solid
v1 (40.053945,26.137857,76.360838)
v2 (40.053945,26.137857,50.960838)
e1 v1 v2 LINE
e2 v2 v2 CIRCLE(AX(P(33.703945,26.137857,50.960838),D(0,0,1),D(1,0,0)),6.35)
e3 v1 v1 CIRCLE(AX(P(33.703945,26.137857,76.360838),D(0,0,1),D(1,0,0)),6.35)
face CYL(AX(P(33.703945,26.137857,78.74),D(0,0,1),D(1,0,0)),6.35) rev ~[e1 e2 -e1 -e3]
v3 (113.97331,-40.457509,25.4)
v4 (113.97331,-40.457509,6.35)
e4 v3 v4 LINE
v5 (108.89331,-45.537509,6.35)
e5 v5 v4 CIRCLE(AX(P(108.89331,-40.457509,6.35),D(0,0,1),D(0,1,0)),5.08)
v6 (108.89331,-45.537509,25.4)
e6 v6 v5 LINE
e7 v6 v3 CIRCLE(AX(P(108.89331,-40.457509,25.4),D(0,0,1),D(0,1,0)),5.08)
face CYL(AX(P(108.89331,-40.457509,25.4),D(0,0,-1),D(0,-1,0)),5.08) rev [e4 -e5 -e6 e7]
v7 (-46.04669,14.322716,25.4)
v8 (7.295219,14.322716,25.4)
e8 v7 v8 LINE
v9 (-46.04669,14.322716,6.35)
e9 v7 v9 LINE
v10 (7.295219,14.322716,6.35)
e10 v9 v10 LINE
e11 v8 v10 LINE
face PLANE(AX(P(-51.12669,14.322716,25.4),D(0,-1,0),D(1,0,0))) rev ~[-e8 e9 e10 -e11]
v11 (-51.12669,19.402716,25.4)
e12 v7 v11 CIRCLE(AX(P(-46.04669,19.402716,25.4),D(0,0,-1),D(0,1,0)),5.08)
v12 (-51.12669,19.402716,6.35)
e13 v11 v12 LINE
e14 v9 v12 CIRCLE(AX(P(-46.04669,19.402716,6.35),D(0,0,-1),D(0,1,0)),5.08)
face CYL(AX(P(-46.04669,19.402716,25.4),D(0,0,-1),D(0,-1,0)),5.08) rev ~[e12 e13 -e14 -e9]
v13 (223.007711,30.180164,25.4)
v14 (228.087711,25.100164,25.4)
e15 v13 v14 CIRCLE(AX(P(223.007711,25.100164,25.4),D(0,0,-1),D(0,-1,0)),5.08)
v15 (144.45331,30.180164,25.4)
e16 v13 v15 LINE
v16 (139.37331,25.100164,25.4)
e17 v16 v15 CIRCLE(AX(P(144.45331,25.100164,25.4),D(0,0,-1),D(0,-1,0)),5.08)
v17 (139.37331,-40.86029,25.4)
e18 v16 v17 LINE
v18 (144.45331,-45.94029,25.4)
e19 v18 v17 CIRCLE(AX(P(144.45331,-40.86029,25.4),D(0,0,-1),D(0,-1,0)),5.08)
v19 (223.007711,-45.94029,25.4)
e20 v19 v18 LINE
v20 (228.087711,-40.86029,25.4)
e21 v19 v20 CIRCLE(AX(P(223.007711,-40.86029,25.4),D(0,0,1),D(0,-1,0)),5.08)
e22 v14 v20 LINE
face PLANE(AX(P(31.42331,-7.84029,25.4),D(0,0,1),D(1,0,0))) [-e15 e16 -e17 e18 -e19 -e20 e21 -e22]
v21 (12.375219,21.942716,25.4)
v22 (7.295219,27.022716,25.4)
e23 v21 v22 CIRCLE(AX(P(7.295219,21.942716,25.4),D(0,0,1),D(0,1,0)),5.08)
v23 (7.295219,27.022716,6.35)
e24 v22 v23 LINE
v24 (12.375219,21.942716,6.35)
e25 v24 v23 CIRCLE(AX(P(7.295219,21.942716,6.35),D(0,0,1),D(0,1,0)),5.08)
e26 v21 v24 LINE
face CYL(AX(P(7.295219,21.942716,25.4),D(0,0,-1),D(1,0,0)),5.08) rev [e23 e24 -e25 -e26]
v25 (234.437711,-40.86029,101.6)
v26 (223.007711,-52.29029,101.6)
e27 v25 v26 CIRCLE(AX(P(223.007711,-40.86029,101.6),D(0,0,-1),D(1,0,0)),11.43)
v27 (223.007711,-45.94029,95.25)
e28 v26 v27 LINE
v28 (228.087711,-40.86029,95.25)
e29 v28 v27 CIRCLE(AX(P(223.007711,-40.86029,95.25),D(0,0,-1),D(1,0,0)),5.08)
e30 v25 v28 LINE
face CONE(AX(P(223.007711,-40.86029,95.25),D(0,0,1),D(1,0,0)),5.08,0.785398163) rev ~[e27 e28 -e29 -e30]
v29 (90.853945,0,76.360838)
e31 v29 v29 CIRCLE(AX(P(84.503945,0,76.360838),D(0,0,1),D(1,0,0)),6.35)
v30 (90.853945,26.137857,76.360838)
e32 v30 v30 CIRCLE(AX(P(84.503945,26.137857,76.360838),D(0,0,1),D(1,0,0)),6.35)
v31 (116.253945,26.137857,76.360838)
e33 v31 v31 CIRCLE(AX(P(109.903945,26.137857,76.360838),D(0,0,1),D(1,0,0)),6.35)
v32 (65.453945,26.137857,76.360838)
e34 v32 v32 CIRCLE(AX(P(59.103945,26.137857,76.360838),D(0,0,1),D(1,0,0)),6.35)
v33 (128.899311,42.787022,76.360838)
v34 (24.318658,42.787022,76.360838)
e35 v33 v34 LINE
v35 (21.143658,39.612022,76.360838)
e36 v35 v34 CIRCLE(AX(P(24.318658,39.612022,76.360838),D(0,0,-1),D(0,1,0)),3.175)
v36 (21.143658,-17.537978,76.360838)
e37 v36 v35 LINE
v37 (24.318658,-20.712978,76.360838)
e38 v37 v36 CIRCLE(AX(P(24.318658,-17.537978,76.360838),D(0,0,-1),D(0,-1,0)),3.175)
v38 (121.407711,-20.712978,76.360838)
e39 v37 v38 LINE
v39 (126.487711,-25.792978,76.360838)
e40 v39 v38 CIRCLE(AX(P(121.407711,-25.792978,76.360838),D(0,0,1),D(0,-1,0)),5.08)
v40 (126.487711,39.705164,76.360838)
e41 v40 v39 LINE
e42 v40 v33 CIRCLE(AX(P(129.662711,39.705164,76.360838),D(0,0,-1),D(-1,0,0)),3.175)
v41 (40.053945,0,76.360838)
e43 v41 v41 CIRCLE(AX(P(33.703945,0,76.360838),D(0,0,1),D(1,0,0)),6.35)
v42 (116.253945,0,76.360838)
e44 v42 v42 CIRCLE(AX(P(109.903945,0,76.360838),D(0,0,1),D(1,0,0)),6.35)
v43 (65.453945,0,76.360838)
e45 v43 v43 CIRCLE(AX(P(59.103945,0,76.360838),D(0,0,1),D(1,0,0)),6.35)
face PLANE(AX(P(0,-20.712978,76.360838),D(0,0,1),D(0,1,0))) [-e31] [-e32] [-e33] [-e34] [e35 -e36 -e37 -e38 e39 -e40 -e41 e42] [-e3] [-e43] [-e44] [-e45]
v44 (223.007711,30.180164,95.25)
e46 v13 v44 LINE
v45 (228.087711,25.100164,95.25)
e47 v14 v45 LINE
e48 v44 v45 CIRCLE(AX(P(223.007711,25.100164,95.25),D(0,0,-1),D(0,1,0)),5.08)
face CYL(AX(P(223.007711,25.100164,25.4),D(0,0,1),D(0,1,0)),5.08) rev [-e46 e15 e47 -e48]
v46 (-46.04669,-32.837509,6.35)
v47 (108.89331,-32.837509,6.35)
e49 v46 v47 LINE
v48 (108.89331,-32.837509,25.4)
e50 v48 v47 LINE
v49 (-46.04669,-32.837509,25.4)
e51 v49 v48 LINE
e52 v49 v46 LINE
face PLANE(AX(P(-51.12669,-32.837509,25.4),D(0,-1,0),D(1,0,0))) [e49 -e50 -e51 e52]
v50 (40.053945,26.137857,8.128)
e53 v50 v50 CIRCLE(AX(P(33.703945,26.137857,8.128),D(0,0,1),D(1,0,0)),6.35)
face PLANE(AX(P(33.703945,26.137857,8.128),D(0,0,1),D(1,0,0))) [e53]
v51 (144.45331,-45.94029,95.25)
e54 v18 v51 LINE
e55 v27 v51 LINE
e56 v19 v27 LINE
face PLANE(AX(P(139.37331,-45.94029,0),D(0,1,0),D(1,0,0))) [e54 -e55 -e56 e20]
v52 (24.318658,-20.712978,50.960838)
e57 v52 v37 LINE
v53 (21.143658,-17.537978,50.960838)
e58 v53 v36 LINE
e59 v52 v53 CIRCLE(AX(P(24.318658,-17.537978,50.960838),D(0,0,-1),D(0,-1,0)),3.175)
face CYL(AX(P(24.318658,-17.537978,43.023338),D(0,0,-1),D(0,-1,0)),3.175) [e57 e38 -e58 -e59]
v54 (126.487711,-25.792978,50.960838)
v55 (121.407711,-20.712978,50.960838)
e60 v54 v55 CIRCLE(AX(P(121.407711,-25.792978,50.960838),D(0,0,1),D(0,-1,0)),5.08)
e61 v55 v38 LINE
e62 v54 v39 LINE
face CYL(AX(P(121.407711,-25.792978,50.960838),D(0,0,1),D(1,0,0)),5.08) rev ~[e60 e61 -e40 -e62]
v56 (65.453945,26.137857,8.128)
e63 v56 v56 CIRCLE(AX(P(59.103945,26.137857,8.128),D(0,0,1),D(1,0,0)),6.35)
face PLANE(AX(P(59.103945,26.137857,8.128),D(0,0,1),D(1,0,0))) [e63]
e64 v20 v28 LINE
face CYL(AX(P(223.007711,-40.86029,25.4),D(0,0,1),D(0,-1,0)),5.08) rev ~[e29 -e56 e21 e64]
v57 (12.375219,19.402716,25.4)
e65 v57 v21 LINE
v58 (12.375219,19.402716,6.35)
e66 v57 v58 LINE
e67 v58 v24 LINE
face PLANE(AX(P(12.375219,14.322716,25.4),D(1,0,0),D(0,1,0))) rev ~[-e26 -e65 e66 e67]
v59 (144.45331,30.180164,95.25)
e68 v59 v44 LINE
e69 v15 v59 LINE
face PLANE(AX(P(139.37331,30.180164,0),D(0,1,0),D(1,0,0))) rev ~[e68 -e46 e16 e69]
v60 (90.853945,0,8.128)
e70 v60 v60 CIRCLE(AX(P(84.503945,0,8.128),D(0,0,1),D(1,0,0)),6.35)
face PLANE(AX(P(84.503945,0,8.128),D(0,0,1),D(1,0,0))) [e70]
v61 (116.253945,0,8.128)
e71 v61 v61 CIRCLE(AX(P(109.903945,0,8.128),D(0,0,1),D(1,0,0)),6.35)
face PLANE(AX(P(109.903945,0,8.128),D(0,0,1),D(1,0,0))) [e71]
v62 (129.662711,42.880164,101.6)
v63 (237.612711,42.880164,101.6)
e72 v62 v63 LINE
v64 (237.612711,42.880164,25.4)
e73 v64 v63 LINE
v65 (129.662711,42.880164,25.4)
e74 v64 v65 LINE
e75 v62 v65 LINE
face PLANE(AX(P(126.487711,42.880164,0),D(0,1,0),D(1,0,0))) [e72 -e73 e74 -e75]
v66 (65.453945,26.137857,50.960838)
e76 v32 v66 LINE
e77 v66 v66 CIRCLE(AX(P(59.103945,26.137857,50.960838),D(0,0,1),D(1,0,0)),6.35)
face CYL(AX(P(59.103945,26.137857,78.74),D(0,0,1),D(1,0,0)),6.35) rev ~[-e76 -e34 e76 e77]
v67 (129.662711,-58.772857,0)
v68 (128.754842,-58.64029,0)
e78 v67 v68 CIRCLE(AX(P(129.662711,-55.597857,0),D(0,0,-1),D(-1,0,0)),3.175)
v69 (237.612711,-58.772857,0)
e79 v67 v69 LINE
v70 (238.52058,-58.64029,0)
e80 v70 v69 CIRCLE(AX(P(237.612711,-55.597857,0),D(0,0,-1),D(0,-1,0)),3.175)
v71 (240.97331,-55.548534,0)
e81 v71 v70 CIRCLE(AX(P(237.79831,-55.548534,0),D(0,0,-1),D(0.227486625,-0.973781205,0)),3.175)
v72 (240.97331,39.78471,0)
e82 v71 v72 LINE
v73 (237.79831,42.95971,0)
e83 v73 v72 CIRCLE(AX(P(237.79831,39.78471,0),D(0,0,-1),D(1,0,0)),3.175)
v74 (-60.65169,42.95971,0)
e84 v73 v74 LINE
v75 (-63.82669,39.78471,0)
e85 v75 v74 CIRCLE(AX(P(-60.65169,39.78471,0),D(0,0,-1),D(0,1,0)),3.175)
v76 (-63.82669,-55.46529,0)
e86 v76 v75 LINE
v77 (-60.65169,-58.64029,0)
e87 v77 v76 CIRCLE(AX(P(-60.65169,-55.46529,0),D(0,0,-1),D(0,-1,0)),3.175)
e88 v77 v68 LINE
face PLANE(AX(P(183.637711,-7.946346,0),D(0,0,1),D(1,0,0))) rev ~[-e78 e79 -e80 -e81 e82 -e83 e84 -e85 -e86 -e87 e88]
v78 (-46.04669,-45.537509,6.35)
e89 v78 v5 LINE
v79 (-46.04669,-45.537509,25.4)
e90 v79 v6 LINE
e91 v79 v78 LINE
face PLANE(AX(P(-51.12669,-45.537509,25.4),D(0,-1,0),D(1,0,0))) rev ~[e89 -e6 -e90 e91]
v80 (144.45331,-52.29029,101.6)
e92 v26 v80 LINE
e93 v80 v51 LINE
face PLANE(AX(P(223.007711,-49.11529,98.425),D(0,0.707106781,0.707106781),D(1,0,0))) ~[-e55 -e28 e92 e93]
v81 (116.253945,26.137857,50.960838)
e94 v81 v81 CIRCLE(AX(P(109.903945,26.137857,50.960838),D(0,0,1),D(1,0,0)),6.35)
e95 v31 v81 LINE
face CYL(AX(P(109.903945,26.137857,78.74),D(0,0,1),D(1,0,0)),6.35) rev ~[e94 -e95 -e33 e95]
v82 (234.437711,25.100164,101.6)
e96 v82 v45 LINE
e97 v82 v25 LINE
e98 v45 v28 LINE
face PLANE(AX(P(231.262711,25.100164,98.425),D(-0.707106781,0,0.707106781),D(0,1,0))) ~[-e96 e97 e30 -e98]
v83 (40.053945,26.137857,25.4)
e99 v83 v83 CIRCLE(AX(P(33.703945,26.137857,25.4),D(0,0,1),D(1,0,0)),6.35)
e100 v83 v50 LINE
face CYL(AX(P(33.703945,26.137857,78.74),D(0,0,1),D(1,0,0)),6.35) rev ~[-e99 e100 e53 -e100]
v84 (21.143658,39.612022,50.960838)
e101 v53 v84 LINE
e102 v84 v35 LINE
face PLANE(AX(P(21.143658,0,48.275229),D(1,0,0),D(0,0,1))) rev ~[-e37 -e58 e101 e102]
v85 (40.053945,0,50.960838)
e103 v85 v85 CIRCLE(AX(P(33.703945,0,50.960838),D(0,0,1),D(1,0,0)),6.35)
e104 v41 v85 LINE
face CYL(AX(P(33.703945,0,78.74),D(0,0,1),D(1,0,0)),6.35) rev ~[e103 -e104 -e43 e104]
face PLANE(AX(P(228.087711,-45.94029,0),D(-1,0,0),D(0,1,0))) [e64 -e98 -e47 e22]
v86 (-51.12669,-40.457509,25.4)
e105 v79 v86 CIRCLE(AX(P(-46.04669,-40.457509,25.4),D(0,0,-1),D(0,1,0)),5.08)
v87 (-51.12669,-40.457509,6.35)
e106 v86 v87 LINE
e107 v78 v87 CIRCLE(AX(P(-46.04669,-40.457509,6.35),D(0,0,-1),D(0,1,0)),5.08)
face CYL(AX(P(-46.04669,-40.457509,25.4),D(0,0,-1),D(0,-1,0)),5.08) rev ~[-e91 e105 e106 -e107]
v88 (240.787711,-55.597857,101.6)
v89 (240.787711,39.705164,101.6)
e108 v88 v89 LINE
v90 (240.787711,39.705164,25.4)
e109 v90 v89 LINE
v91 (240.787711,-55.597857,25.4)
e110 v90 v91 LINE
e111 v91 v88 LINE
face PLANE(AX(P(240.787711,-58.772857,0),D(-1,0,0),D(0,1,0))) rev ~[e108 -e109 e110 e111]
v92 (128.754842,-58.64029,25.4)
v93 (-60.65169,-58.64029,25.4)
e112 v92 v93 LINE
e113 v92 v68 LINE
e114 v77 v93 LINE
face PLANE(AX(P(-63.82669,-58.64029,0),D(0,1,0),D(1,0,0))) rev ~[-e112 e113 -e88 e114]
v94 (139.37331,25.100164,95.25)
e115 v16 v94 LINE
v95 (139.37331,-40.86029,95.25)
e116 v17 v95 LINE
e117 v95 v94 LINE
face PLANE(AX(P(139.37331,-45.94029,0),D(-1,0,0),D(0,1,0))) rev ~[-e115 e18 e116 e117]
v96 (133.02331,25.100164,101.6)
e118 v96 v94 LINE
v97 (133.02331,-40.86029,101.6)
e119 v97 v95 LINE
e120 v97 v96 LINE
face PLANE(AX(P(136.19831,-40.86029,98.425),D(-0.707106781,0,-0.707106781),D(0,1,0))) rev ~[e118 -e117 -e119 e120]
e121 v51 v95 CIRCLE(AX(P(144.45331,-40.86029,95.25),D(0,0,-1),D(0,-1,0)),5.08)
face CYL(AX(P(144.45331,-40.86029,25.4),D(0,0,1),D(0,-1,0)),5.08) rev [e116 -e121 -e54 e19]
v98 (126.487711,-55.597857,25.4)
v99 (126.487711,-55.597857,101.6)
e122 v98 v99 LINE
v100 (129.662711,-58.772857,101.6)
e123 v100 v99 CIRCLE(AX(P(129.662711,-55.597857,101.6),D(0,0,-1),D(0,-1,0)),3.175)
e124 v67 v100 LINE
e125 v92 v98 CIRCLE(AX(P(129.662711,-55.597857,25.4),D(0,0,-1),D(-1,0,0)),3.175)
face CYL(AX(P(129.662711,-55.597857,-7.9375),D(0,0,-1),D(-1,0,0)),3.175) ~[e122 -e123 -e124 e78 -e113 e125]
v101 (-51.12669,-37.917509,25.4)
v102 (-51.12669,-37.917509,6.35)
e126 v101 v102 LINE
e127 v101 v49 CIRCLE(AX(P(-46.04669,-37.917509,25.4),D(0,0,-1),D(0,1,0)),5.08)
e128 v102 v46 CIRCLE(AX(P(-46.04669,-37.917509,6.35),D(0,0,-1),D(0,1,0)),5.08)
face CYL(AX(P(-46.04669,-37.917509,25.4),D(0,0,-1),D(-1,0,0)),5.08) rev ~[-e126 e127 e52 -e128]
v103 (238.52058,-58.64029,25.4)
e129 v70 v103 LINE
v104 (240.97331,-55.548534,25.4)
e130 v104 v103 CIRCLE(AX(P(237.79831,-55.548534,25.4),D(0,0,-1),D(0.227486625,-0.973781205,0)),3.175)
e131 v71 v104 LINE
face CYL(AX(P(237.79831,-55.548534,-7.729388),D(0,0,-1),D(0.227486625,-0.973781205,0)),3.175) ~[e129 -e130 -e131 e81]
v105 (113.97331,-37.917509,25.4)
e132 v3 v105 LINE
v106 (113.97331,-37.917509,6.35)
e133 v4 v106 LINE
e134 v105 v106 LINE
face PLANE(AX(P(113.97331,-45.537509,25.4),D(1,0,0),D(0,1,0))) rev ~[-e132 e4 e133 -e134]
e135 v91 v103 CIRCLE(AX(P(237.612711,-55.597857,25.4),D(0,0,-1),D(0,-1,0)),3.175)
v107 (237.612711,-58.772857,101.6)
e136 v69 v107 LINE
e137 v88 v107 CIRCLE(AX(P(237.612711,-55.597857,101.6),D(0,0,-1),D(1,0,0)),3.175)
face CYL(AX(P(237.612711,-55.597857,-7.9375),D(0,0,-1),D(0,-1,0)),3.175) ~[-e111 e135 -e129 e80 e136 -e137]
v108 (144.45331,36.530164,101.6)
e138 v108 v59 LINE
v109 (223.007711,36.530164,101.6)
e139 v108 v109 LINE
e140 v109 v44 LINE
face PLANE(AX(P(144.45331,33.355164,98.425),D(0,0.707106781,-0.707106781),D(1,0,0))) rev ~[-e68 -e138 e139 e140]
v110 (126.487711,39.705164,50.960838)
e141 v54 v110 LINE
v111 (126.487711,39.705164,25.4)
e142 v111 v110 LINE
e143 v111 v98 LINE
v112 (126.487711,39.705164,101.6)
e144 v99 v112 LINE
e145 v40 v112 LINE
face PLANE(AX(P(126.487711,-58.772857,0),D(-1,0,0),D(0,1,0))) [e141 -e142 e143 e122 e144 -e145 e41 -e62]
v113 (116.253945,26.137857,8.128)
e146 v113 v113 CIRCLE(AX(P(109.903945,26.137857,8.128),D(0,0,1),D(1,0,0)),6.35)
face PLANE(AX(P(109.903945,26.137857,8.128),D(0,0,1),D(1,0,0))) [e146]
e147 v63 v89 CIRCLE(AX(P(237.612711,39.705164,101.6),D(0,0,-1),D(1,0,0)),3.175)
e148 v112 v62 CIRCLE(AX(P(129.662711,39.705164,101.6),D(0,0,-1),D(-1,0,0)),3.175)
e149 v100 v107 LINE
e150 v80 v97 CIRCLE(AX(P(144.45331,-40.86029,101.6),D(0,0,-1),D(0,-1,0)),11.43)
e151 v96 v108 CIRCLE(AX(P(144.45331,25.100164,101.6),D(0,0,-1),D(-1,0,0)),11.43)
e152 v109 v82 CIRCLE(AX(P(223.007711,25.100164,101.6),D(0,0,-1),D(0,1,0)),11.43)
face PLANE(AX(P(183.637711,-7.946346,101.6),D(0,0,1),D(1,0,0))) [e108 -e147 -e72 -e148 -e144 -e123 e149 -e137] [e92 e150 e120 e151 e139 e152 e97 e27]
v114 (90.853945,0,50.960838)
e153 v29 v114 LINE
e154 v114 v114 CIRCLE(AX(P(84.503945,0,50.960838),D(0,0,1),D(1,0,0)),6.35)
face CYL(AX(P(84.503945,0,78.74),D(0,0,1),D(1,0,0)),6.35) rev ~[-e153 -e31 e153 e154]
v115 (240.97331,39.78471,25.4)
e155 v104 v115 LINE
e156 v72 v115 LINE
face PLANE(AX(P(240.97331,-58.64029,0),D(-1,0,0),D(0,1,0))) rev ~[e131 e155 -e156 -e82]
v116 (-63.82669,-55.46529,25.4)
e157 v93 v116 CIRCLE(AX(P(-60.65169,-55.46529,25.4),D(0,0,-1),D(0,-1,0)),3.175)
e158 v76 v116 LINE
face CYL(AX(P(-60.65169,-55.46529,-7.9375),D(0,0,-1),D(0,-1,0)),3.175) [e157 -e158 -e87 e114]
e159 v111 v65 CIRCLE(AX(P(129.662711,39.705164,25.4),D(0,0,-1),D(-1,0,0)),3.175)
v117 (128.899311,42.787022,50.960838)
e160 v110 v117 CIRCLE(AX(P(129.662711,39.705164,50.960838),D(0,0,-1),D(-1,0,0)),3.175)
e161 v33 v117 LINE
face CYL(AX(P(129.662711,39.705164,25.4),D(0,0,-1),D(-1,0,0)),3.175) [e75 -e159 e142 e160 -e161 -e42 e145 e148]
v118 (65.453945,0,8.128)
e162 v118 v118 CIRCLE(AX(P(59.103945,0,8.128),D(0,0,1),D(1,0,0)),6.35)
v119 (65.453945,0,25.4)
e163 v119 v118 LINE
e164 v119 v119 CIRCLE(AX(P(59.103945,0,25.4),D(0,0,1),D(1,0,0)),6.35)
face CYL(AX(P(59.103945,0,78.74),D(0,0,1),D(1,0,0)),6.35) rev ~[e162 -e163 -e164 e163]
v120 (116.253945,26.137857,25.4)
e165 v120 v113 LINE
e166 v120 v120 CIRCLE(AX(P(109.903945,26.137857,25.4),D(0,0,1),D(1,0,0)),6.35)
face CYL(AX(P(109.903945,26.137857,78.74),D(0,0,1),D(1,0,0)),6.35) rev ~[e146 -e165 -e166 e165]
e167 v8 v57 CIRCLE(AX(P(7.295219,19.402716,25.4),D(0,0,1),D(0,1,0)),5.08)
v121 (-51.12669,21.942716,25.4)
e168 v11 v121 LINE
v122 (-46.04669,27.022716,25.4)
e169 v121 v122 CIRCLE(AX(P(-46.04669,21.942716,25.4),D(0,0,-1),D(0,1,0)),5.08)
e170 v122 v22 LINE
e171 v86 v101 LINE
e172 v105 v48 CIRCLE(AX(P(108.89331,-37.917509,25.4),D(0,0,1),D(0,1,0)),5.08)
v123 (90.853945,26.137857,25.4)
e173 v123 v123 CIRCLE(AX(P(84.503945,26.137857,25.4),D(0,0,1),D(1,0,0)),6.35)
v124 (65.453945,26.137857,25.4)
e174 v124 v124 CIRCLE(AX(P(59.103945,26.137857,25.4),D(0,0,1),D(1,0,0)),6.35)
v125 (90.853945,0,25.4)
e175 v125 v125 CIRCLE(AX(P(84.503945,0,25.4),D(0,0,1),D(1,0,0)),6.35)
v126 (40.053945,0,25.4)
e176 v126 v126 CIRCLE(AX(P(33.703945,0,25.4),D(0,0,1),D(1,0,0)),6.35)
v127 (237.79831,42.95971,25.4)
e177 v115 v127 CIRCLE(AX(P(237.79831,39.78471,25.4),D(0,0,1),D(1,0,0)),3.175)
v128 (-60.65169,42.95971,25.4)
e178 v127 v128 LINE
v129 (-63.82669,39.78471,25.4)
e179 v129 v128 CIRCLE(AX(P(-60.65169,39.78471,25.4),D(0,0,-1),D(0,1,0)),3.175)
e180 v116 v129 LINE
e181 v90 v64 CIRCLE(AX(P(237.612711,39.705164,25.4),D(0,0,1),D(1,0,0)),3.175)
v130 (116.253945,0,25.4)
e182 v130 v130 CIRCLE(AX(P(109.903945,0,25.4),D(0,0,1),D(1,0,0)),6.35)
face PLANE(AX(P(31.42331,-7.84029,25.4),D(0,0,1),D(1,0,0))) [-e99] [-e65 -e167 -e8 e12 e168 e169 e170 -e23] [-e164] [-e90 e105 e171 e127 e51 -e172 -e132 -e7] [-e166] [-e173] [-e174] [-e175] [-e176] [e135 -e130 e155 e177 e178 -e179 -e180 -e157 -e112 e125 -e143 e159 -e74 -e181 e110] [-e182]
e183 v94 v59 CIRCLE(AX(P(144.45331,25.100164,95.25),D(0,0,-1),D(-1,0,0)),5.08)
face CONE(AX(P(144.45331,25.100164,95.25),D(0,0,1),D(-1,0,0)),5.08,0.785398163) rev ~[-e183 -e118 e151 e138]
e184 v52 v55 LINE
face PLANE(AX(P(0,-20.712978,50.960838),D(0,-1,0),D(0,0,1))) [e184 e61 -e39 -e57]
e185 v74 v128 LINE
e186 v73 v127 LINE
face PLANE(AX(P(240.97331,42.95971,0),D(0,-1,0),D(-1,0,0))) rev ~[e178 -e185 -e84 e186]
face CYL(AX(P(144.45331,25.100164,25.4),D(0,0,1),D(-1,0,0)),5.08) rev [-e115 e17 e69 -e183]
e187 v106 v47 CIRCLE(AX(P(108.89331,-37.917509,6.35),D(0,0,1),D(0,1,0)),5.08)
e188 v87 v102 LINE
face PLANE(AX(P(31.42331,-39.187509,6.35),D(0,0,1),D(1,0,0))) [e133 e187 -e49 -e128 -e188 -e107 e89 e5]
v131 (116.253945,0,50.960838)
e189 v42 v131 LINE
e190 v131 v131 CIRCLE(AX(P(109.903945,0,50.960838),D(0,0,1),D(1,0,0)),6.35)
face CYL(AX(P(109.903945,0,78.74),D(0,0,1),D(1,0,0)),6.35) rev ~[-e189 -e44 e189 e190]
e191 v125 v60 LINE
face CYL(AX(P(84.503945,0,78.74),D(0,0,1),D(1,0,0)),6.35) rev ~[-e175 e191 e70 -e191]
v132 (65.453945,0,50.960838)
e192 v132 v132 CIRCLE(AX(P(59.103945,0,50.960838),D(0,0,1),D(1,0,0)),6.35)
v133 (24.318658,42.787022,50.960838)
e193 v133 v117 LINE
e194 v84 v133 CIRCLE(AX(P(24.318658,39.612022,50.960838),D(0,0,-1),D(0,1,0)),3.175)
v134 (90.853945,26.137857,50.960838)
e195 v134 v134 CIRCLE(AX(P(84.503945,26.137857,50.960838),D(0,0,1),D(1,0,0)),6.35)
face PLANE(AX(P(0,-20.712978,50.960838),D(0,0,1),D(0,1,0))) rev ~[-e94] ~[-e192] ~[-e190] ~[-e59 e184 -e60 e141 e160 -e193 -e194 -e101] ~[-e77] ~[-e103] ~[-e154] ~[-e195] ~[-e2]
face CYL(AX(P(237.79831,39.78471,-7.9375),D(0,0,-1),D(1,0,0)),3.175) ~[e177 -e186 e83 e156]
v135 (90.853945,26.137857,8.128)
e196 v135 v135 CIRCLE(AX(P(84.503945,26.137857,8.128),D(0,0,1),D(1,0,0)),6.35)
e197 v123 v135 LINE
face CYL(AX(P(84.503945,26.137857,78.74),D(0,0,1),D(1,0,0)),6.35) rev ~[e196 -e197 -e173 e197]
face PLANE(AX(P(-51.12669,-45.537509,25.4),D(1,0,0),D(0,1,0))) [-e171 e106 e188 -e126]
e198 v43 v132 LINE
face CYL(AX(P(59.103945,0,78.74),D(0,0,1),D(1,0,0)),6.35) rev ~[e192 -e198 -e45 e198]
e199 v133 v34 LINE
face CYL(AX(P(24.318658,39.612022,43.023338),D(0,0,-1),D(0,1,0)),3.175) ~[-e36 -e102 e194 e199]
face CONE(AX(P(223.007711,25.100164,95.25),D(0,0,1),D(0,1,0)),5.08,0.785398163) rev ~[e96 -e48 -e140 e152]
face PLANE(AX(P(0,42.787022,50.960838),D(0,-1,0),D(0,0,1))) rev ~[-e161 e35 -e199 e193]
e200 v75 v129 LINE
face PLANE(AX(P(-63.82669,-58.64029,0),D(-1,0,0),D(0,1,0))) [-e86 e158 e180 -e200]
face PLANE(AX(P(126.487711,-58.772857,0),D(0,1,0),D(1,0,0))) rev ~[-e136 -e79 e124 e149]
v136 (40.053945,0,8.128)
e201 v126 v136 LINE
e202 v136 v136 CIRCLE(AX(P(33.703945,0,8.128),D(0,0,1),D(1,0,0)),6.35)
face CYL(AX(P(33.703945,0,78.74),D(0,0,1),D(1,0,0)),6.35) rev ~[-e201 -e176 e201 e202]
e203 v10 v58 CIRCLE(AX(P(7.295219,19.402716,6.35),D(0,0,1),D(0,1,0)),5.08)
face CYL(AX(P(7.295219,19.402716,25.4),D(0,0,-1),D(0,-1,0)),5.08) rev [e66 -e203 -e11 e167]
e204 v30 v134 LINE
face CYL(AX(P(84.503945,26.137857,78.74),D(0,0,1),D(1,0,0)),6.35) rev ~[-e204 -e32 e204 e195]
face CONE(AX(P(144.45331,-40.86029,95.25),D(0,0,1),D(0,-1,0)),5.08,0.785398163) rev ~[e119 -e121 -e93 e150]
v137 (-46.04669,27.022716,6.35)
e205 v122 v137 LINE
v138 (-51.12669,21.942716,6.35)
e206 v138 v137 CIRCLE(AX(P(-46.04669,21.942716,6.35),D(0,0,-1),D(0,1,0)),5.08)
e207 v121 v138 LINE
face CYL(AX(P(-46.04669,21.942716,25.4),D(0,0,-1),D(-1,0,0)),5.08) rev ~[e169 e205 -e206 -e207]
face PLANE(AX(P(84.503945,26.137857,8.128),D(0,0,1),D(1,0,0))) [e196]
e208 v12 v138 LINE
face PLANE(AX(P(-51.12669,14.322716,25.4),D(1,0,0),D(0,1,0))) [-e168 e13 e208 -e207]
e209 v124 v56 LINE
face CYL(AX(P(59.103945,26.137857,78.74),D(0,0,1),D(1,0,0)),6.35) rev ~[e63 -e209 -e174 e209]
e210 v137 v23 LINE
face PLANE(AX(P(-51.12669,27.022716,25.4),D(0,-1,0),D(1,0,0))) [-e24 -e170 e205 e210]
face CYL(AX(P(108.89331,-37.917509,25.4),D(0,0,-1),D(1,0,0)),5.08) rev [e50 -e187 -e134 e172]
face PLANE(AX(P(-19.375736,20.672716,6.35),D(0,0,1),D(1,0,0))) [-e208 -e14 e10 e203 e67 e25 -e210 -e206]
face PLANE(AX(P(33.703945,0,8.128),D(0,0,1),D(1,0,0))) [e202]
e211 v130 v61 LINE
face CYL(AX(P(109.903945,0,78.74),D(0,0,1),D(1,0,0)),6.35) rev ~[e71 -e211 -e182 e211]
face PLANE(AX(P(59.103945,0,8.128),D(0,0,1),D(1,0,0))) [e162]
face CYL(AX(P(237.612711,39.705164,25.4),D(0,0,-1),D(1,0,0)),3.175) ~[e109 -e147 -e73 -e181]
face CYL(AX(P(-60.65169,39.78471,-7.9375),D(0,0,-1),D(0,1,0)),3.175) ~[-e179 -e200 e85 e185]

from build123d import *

# Parameters (mm, degrees)
F0_W          = 190.5
F0_H          = 101.6
F0_W_2        = 114.3
F0_W_3        = 88.9
F0_H_2        = 76.1922433317
F1_DEPTH      = 25.4
F2_W          = 114.3
F2_H          = 101.6530208289
F2_W_2        = 88.7144011029
F2_H_2        = 76.1204539018
F3_DEPTH      = 101.6
F4_W          = 63.5
F4_H          = 25.4
F5_DEPTH      = 126.4877107566
F6_W          = 21.1436580867
F6_H          = 30.0582610071
F7_DEPTH      = 108.712
F9_W          = 63.5019093752
F9_H          = 12.7
F9_W_2        = 165.1
F10_DEPTH     = 19.05
F12_R         = 6.35
F13_DEPTH     = 70.612
F14_T1_DEPTH  = 41.275
F14_T3_DEPTH  = 41.275
F14_T5_DEPTH  = 84.1375
F14_T10_DEPTH = 117.475
F14_T16_DEPTH = 117.475
F14_T22_DEPTH = 117.475
F14_T28_DEPTH = 84.1375
F14_T34_DEPTH = 84.1375
F14_T40_DEPTH = 84.1375
F14_T47_DEPTH = 84.1375
F14_T53_DEPTH = 84.1375
F14_T59_DEPTH = 117.475
F14_T65_DEPTH = 117.475
F14_T71_DEPTH = 117.475
F15_T1_DEPTH  = 40.8587766312
F15_T3_DEPTH  = 41.275
F16_R         = 5.08
F17_SIZE      = 6.35


# Not quite as in the source:
# - a fillet or chamfer that OpenCascade refuses, or shapes differently, is made with other operations: its cross-section is extruded or revolved along the edge and cut away or added


with BuildPart() as f1:
    # F0 (on Top) → F1 (new body)
    with BuildSketch(Plane.XY):
        with Locations((31.4233096536, -7.8402895808)):
            Rectangle(F0_W, F0_H)
        with Locations((183.8233096536, -7.8402895808)):
            Rectangle(F0_W_2, F0_H)
        with Locations((183.8233096536, -7.844167915)):
            Rectangle(F0_W_3, F0_H_2, mode=Mode.SUBTRACT)
        with Locations((183.8233096536, -7.844167915)):
            Rectangle(F0_W_3, F0_H_2)
    extrude(amount=F1_DEPTH)

    # F2 (on Top) → F3 (join)
    with BuildSketch(Plane.XY):
        with Locations((183.6377107566, -7.9463460934)):
            Rectangle(F2_W, F2_H)
        with Locations((183.7305102051, -7.8800626299)):
            Rectangle(F2_W_2, F2_H_2, mode=Mode.SUBTRACT)
    extrude(amount=F3_DEPTH)

    # F4 (on Right) → F5 (join, through all)
    with BuildSketch(Plane.YZ):
        with Locations((11.0370218754, 63.6608382941)):
            Rectangle(F4_W, F4_H)
    extrude(amount=F5_DEPTH)

    # F6 (on Front) → F7 (cut, symmetric)
    with BuildSketch(Plane.XZ):
        with Locations((10.5718290433, 63.3043590933)):
            Rectangle(F6_W, F6_H)
    extrude(amount=F7_DEPTH, both=True, mode=Mode.SUBTRACT)

    # F9 (on offset) → F10 (cut)
    with BuildSketch(Plane.XY.offset(25.4)):
        with Locations((-19.3757356588, 20.6727156579)):
            Rectangle(F9_W, F9_H)
        with Locations((31.4233096536, -39.1875091776)):
            Rectangle(F9_W_2, F9_H)
    extrude(amount=-F10_DEPTH, mode=Mode.SUBTRACT)

    # F12 (on offset) → F13 (cut)
    with BuildSketch(Plane.XY.offset(78.74)):
        with Locations((33.7039453115, 26.1378572217)):
            Circle(F12_R)
        with Locations((59.1039453115, 26.1378572217)):
            Circle(F12_R)
        with Locations((84.5039453115, 26.1378572217)):
            Circle(F12_R)
        with Locations((109.9039453115, 26.1378572217)):
            Circle(F12_R)
        with Locations((109.9039453115, 0)):
            Circle(F12_R)
        with Locations((84.5039453115, 0)):
            Circle(F12_R)
        with Locations((59.1039453115, 0)):
            Circle(F12_R)
        with Locations((33.7039453115, 0)):
            Circle(F12_R)
    extrude(amount=-F13_DEPTH, mode=Mode.SUBTRACT)

    # F14: fillet of radius 3.175 on 7 edges, made by hand

    # F14_s2 → F14_t1 (cut)
    with BuildSketch(Plane.XY.offset(43.0233382941)):
        with BuildLine():
            ThreePointArc((24.3186580867, -20.7129781246), (22.0735940564, -19.7830421549), (21.1436580867, -17.5379781246))
            Line((21.1436580867, -17.5379781246), (21.1436580867, -20.7129781246))
            Line((21.1436580867, -20.7129781246), (24.3186580867, -20.7129781246))
        make_face()
        with BuildLine():
            ThreePointArc((24.3186580867, 42.7870218754), (22.0735940564, 41.8570859056), (21.1436580867, 39.6120218754))
            Line((21.1436580867, 39.6120218754), (21.1436580867, 42.7870218754))
            Line((21.1436580867, 42.7870218754), (24.3186580867, 42.7870218754))
        make_face()
    extrude(amount=F14_T1_DEPTH, mode=Mode.SUBTRACT)

    # F14_s4 → F14_t3 (cut)
    with BuildSketch(Plane.XY.offset(-7.9375)):
        with BuildLine():
            ThreePointArc((240.9733096536, 39.7847104192), (240.0433736839, 42.0297744494), (237.7983096536, 42.9597104192))
            Line((237.7983096536, 42.9597104192), (240.9733096536, 42.9597104192))
            Line((240.9733096536, 42.9597104192), (240.9733096536, 39.7847104192))
        make_face()
    extrude(amount=F14_T3_DEPTH, mode=Mode.SUBTRACT)

    # F14_s6 → F14_t5 (cut)
    with BuildSketch(Plane.XY.offset(25.4)):
        with BuildLine():
            ThreePointArc((240.7877107566, 39.705164321), (239.8577747868, 41.9502283513), (237.6127107566, 42.880164321))
            Line((237.6127107566, 42.880164321), (240.7877107566, 42.880164321))
            Line((240.7877107566, 42.880164321), (240.7877107566, 39.705164321))
        make_face()
    extrude(amount=F14_T5_DEPTH, mode=Mode.SUBTRACT)


with BuildPart() as f14_tool8:
    # F14_s9 → F14_t10 (new body)
    with BuildSketch(Plane.XY.offset(-7.9375)):
        with BuildLine():
            ThreePointArc((126.4877107566, -55.5978565079), (127.4176467263, -57.8429205382), (129.6627107566, -58.7728565079))
            Line((129.6627107566, -58.7728565079), (126.4877107566, -58.7728565079))
            Line((126.4877107566, -58.7728565079), (126.4877107566, -55.5978565079))
        make_face()
    extrude(amount=F14_T10_DEPTH)

    split(bisect_by=Plane.XZ.offset(58.6402895808), keep=Keep.TOP)

    split(bisect_by=Plane.XY.offset(25.4), keep=Keep.BOTTOM)


with BuildPart() as f1_1:
    add(f1.part)

    # F14_t7: cut F14_tool8
    add(f14_tool8.part, mode=Mode.SUBTRACT)


with BuildPart() as f14_tool14:
    # F14_s15 → F14_t16 (new body)
    with BuildSketch(Plane.XY.offset(-7.9375)):
        with BuildLine():
            ThreePointArc((126.4877107566, -55.5978565079), (127.4176467263, -57.8429205382), (129.6627107566, -58.7728565079))
            Line((129.6627107566, -58.7728565079), (126.4877107566, -58.7728565079))
            Line((126.4877107566, -58.7728565079), (126.4877107566, -55.5978565079))
        make_face()
    extrude(amount=F14_T16_DEPTH)

    split(bisect_by=Plane.XZ.offset(58.6402895808), keep=Keep.BOTTOM)

    split(bisect_by=Plane.XY.offset(25.4), keep=Keep.TOP)


with BuildPart() as f1_2:
    add(f1_1.part)

    # F14_t13: cut F14_tool14
    add(f14_tool14.part, mode=Mode.SUBTRACT)


with BuildPart() as f14_tool20:
    # F14_s21 → F14_t22 (new body)
    with BuildSketch(Plane.XY.offset(-7.9375)):
        with BuildLine():
            ThreePointArc((126.4877107566, -55.5978565079), (127.4176467263, -57.8429205382), (129.6627107566, -58.7728565079))
            Line((129.6627107566, -58.7728565079), (126.4877107566, -58.7728565079))
            Line((126.4877107566, -58.7728565079), (126.4877107566, -55.5978565079))
        make_face()
    extrude(amount=F14_T22_DEPTH)

    split(bisect_by=Plane.XZ.offset(58.6402895808), keep=Keep.TOP)

    split(bisect_by=Plane.XY.offset(25.4), keep=Keep.TOP)


with BuildPart() as f1_3:
    add(f1_2.part)

    # F14_t19: cut F14_tool20
    add(f14_tool20.part, mode=Mode.SUBTRACT)


with BuildPart() as f14_tool26:
    # F14_s27 → F14_t28 (new body)
    with BuildSketch(Plane.XY.offset(25.4)):
        with BuildLine():
            ThreePointArc((126.4877107566, 39.705164321), (127.4176467263, 41.9502283513), (129.6627107566, 42.880164321))
            Line((129.6627107566, 42.880164321), (126.4877107566, 42.880164321))
            Line((126.4877107566, 42.880164321), (126.4877107566, 39.705164321))
        make_face()
    extrude(amount=F14_T28_DEPTH)

    split(bisect_by=Plane.XY.offset(50.9608382941), keep=Keep.BOTTOM)

    split(bisect_by=Plane.XZ.offset(-42.7870218754), keep=Keep.TOP)


with BuildPart() as f1_4:
    add(f1_3.part)

    # F14_t25: cut F14_tool26
    add(f14_tool26.part, mode=Mode.SUBTRACT)


with BuildPart() as f14_tool32:
    # F14_s33 → F14_t34 (new body)
    with BuildSketch(Plane.XY.offset(25.4)):
        with BuildLine():
            ThreePointArc((126.4877107566, 39.705164321), (127.4176467263, 41.9502283513), (129.6627107566, 42.880164321))
            Line((129.6627107566, 42.880164321), (126.4877107566, 42.880164321))
            Line((126.4877107566, 42.880164321), (126.4877107566, 39.705164321))
        make_face()
    extrude(amount=F14_T34_DEPTH)

    split(bisect_by=Plane.XY.offset(50.9608382941), keep=Keep.BOTTOM)

    split(bisect_by=Plane.XZ.offset(-42.7870218754), keep=Keep.BOTTOM)


with BuildPart() as f1_5:
    add(f1_4.part)

    # F14_t31: cut F14_tool32
    add(f14_tool32.part, mode=Mode.SUBTRACT)


with BuildPart() as f14_tool38:
    # F14_s39 → F14_t40 (new body)
    with BuildSketch(Plane.XY.offset(25.4)):
        with BuildLine():
            ThreePointArc((126.4877107566, 39.705164321), (127.4176467263, 41.9502283513), (129.6627107566, 42.880164321))
            Line((129.6627107566, 42.880164321), (126.4877107566, 42.880164321))
            Line((126.4877107566, 42.880164321), (126.4877107566, 39.705164321))
        make_face()
    extrude(amount=F14_T40_DEPTH)

    split(bisect_by=Plane.XY.offset(50.9608382941), keep=Keep.TOP)

    split(bisect_by=Plane.XZ.offset(-42.7870218754), keep=Keep.BOTTOM)

    split(bisect_by=Plane.XY.offset(76.3608382941), keep=Keep.BOTTOM)


with BuildPart() as f1_6:
    add(f1_5.part)

    # F14_t37: cut F14_tool38
    add(f14_tool38.part, mode=Mode.SUBTRACT)


with BuildPart() as f14_tool45:
    # F14_s46 → F14_t47 (new body)
    with BuildSketch(Plane.XY.offset(25.4)):
        with BuildLine():
            ThreePointArc((126.4877107566, 39.705164321), (127.4176467263, 41.9502283513), (129.6627107566, 42.880164321))
            Line((129.6627107566, 42.880164321), (126.4877107566, 42.880164321))
            Line((126.4877107566, 42.880164321), (126.4877107566, 39.705164321))
        make_face()
    extrude(amount=F14_T47_DEPTH)

    split(bisect_by=Plane.XZ.offset(-42.7870218754), keep=Keep.TOP)

    split(bisect_by=Plane.XY.offset(76.3608382941), keep=Keep.TOP)


with BuildPart() as f1_7:
    add(f1_6.part)

    # F14_t44: cut F14_tool45
    add(f14_tool45.part, mode=Mode.SUBTRACT)


with BuildPart() as f14_tool51:
    # F14_s52 → F14_t53 (new body)
    with BuildSketch(Plane.XY.offset(25.4)):
        with BuildLine():
            ThreePointArc((126.4877107566, 39.705164321), (127.4176467263, 41.9502283513), (129.6627107566, 42.880164321))
            Line((129.6627107566, 42.880164321), (126.4877107566, 42.880164321))
            Line((126.4877107566, 42.880164321), (126.4877107566, 39.705164321))
        make_face()
    extrude(amount=F14_T53_DEPTH)

    split(bisect_by=Plane.XZ.offset(-42.7870218754), keep=Keep.BOTTOM)

    split(bisect_by=Plane.XY.offset(76.3608382941), keep=Keep.TOP)


with BuildPart() as f1_8:
    add(f1_7.part)

    # F14_t50: cut F14_tool51
    add(f14_tool51.part, mode=Mode.SUBTRACT)


with BuildPart() as f14_tool57:
    # F14_s58 → F14_t59 (new body)
    with BuildSketch(Plane.XY.offset(-7.9375)):
        with BuildLine():
            ThreePointArc((237.6127107566, -58.7728565079), (239.8577747868, -57.8429205382), (240.7877107566, -55.5978565079))
            Line((240.7877107566, -55.5978565079), (240.7877107566, -58.7728565079))
            Line((240.7877107566, -58.7728565079), (237.6127107566, -58.7728565079))
        make_face()
    extrude(amount=F14_T59_DEPTH)

    split(bisect_by=Plane.XY.offset(25.4), keep=Keep.BOTTOM)

    split(bisect_by=Plane.XZ.offset(58.6402895808), keep=Keep.TOP)


with BuildPart() as f1_9:
    add(f1_8.part)

    # F14_t56: cut F14_tool57
    add(f14_tool57.part, mode=Mode.SUBTRACT)


with BuildPart() as f14_tool63:
    # F14_s64 → F14_t65 (new body)
    with BuildSketch(Plane.XY.offset(-7.9375)):
        with BuildLine():
            ThreePointArc((237.6127107566, -58.7728565079), (239.8577747868, -57.8429205382), (240.7877107566, -55.5978565079))
            Line((240.7877107566, -55.5978565079), (240.7877107566, -58.7728565079))
            Line((240.7877107566, -58.7728565079), (237.6127107566, -58.7728565079))
        make_face()
    extrude(amount=F14_T65_DEPTH)

    split(bisect_by=Plane.XY.offset(25.4), keep=Keep.TOP)

    split(bisect_by=Plane.XZ.offset(58.6402895808), keep=Keep.TOP)


with BuildPart() as f1_10:
    add(f1_9.part)

    # F14_t62: cut F14_tool63
    add(f14_tool63.part, mode=Mode.SUBTRACT)


with BuildPart() as f14_tool69:
    # F14_s70 → F14_t71 (new body)
    with BuildSketch(Plane.XY.offset(-7.9375)):
        with BuildLine():
            ThreePointArc((237.6127107566, -58.7728565079), (239.8577747868, -57.8429205382), (240.7877107566, -55.5978565079))
            Line((240.7877107566, -55.5978565079), (240.7877107566, -58.7728565079))
            Line((240.7877107566, -58.7728565079), (237.6127107566, -58.7728565079))
        make_face()
    extrude(amount=F14_T71_DEPTH)

    split(bisect_by=Plane.XY.offset(25.4), keep=Keep.TOP)

    split(bisect_by=Plane.XZ.offset(58.6402895808), keep=Keep.BOTTOM)


with BuildPart() as f1_11:
    add(f1_10.part)

    # F14_t68: cut F14_tool69
    add(f14_tool69.part, mode=Mode.SUBTRACT)

    # F15: fillet of radius 3.175 on 3 edges, made by hand

    # F15_s2 → F15_t1 (cut)
    with BuildSketch(Plane.XY.offset(-7.7293883156)):
        with BuildLine():
            ThreePointArc((238.5205796881, -58.6402895808), (240.2856608913, -57.5217825462), (240.9733096536, -55.5485342546))
            Line((240.9733096536, -55.5485342546), (241.0368096536, -55.5485342546))
            Line((241.0368096536, -55.5485342546), (241.0368096536, -58.6402895808))
            Line((241.0368096536, -58.6402895808), (240.9733096536, -58.7037895808))
            ThreePointArc((240.9733096536, -58.7037895808), (239.7469446708, -58.7037895808), (238.5350250887, -58.7021246873))
            Line((238.5350250887, -58.7021246873), (238.5205796881, -58.6402895808))
        make_face()
    extrude(amount=F15_T1_DEPTH, mode=Mode.SUBTRACT)

    # F15_s4 → F15_t3 (cut)
    with BuildSketch(Plane.XY.offset(-7.9375)):
        with BuildLine():
            ThreePointArc((-60.6516903464, -58.6402895808), (-62.8967543766, -57.7103536111), (-63.8266903464, -55.4652895808))
            Line((-63.8266903464, -55.4652895808), (-63.8901903464, -55.4652895808))
            Line((-63.8901903464, -55.4652895808), (-63.8901903464, -58.7037895808))
            Line((-63.8901903464, -58.7037895808), (-60.6516903464, -58.7037895808))
            Line((-60.6516903464, -58.7037895808), (-60.6516903464, -58.6402895808))
        make_face()
        with BuildLine():
            ThreePointArc((-60.6516903464, 42.9597104192), (-62.8967543766, 42.0297744494), (-63.8266903464, 39.7847104192))
            Line((-63.8266903464, 39.7847104192), (-63.8901903464, 39.7847104192))
            Line((-63.8901903464, 39.7847104192), (-63.8901903464, 43.0232104192))
            Line((-63.8901903464, 43.0232104192), (-60.6516903464, 43.0232104192))
            Line((-60.6516903464, 43.0232104192), (-60.6516903464, 42.9597104192))
        make_face()
    extrude(amount=F15_T3_DEPTH, mode=Mode.SUBTRACT)

    # F16
    f16_edges = [f1_11.edges().sort_by_distance(p)[0] for p in [
        (12.375219, 27.022716, 15.875),
        (12.375219, 14.322716, 15.875),
        (-51.12669, 27.022716, 15.875),
        (-51.12669, 14.322716, 15.875),
        (-51.12669, -32.837509, 15.875),
        (-51.12669, -45.537509, 15.875),
        (113.97331, -32.837509, 15.875),
        (113.97331, -45.537509, 15.875),
        (126.487711, -20.712978, 63.660838),
        (139.37331, 30.180164, 63.5),
        (139.37331, -45.94029, 63.5),
        (228.087711, 30.180164, 63.5),
        (228.087711, -45.94029, 63.5),
    ]]
    fillet(f16_edges, radius=F16_R)

    # F17
    f17_edges = [f1_11.edges().sort_by_distance(p)[0] for p in [
        (139.37331, -7.880063, 101.6),
    ]]
    chamfer(f17_edges, length=F17_SIZE)


solid = f1_11.part
